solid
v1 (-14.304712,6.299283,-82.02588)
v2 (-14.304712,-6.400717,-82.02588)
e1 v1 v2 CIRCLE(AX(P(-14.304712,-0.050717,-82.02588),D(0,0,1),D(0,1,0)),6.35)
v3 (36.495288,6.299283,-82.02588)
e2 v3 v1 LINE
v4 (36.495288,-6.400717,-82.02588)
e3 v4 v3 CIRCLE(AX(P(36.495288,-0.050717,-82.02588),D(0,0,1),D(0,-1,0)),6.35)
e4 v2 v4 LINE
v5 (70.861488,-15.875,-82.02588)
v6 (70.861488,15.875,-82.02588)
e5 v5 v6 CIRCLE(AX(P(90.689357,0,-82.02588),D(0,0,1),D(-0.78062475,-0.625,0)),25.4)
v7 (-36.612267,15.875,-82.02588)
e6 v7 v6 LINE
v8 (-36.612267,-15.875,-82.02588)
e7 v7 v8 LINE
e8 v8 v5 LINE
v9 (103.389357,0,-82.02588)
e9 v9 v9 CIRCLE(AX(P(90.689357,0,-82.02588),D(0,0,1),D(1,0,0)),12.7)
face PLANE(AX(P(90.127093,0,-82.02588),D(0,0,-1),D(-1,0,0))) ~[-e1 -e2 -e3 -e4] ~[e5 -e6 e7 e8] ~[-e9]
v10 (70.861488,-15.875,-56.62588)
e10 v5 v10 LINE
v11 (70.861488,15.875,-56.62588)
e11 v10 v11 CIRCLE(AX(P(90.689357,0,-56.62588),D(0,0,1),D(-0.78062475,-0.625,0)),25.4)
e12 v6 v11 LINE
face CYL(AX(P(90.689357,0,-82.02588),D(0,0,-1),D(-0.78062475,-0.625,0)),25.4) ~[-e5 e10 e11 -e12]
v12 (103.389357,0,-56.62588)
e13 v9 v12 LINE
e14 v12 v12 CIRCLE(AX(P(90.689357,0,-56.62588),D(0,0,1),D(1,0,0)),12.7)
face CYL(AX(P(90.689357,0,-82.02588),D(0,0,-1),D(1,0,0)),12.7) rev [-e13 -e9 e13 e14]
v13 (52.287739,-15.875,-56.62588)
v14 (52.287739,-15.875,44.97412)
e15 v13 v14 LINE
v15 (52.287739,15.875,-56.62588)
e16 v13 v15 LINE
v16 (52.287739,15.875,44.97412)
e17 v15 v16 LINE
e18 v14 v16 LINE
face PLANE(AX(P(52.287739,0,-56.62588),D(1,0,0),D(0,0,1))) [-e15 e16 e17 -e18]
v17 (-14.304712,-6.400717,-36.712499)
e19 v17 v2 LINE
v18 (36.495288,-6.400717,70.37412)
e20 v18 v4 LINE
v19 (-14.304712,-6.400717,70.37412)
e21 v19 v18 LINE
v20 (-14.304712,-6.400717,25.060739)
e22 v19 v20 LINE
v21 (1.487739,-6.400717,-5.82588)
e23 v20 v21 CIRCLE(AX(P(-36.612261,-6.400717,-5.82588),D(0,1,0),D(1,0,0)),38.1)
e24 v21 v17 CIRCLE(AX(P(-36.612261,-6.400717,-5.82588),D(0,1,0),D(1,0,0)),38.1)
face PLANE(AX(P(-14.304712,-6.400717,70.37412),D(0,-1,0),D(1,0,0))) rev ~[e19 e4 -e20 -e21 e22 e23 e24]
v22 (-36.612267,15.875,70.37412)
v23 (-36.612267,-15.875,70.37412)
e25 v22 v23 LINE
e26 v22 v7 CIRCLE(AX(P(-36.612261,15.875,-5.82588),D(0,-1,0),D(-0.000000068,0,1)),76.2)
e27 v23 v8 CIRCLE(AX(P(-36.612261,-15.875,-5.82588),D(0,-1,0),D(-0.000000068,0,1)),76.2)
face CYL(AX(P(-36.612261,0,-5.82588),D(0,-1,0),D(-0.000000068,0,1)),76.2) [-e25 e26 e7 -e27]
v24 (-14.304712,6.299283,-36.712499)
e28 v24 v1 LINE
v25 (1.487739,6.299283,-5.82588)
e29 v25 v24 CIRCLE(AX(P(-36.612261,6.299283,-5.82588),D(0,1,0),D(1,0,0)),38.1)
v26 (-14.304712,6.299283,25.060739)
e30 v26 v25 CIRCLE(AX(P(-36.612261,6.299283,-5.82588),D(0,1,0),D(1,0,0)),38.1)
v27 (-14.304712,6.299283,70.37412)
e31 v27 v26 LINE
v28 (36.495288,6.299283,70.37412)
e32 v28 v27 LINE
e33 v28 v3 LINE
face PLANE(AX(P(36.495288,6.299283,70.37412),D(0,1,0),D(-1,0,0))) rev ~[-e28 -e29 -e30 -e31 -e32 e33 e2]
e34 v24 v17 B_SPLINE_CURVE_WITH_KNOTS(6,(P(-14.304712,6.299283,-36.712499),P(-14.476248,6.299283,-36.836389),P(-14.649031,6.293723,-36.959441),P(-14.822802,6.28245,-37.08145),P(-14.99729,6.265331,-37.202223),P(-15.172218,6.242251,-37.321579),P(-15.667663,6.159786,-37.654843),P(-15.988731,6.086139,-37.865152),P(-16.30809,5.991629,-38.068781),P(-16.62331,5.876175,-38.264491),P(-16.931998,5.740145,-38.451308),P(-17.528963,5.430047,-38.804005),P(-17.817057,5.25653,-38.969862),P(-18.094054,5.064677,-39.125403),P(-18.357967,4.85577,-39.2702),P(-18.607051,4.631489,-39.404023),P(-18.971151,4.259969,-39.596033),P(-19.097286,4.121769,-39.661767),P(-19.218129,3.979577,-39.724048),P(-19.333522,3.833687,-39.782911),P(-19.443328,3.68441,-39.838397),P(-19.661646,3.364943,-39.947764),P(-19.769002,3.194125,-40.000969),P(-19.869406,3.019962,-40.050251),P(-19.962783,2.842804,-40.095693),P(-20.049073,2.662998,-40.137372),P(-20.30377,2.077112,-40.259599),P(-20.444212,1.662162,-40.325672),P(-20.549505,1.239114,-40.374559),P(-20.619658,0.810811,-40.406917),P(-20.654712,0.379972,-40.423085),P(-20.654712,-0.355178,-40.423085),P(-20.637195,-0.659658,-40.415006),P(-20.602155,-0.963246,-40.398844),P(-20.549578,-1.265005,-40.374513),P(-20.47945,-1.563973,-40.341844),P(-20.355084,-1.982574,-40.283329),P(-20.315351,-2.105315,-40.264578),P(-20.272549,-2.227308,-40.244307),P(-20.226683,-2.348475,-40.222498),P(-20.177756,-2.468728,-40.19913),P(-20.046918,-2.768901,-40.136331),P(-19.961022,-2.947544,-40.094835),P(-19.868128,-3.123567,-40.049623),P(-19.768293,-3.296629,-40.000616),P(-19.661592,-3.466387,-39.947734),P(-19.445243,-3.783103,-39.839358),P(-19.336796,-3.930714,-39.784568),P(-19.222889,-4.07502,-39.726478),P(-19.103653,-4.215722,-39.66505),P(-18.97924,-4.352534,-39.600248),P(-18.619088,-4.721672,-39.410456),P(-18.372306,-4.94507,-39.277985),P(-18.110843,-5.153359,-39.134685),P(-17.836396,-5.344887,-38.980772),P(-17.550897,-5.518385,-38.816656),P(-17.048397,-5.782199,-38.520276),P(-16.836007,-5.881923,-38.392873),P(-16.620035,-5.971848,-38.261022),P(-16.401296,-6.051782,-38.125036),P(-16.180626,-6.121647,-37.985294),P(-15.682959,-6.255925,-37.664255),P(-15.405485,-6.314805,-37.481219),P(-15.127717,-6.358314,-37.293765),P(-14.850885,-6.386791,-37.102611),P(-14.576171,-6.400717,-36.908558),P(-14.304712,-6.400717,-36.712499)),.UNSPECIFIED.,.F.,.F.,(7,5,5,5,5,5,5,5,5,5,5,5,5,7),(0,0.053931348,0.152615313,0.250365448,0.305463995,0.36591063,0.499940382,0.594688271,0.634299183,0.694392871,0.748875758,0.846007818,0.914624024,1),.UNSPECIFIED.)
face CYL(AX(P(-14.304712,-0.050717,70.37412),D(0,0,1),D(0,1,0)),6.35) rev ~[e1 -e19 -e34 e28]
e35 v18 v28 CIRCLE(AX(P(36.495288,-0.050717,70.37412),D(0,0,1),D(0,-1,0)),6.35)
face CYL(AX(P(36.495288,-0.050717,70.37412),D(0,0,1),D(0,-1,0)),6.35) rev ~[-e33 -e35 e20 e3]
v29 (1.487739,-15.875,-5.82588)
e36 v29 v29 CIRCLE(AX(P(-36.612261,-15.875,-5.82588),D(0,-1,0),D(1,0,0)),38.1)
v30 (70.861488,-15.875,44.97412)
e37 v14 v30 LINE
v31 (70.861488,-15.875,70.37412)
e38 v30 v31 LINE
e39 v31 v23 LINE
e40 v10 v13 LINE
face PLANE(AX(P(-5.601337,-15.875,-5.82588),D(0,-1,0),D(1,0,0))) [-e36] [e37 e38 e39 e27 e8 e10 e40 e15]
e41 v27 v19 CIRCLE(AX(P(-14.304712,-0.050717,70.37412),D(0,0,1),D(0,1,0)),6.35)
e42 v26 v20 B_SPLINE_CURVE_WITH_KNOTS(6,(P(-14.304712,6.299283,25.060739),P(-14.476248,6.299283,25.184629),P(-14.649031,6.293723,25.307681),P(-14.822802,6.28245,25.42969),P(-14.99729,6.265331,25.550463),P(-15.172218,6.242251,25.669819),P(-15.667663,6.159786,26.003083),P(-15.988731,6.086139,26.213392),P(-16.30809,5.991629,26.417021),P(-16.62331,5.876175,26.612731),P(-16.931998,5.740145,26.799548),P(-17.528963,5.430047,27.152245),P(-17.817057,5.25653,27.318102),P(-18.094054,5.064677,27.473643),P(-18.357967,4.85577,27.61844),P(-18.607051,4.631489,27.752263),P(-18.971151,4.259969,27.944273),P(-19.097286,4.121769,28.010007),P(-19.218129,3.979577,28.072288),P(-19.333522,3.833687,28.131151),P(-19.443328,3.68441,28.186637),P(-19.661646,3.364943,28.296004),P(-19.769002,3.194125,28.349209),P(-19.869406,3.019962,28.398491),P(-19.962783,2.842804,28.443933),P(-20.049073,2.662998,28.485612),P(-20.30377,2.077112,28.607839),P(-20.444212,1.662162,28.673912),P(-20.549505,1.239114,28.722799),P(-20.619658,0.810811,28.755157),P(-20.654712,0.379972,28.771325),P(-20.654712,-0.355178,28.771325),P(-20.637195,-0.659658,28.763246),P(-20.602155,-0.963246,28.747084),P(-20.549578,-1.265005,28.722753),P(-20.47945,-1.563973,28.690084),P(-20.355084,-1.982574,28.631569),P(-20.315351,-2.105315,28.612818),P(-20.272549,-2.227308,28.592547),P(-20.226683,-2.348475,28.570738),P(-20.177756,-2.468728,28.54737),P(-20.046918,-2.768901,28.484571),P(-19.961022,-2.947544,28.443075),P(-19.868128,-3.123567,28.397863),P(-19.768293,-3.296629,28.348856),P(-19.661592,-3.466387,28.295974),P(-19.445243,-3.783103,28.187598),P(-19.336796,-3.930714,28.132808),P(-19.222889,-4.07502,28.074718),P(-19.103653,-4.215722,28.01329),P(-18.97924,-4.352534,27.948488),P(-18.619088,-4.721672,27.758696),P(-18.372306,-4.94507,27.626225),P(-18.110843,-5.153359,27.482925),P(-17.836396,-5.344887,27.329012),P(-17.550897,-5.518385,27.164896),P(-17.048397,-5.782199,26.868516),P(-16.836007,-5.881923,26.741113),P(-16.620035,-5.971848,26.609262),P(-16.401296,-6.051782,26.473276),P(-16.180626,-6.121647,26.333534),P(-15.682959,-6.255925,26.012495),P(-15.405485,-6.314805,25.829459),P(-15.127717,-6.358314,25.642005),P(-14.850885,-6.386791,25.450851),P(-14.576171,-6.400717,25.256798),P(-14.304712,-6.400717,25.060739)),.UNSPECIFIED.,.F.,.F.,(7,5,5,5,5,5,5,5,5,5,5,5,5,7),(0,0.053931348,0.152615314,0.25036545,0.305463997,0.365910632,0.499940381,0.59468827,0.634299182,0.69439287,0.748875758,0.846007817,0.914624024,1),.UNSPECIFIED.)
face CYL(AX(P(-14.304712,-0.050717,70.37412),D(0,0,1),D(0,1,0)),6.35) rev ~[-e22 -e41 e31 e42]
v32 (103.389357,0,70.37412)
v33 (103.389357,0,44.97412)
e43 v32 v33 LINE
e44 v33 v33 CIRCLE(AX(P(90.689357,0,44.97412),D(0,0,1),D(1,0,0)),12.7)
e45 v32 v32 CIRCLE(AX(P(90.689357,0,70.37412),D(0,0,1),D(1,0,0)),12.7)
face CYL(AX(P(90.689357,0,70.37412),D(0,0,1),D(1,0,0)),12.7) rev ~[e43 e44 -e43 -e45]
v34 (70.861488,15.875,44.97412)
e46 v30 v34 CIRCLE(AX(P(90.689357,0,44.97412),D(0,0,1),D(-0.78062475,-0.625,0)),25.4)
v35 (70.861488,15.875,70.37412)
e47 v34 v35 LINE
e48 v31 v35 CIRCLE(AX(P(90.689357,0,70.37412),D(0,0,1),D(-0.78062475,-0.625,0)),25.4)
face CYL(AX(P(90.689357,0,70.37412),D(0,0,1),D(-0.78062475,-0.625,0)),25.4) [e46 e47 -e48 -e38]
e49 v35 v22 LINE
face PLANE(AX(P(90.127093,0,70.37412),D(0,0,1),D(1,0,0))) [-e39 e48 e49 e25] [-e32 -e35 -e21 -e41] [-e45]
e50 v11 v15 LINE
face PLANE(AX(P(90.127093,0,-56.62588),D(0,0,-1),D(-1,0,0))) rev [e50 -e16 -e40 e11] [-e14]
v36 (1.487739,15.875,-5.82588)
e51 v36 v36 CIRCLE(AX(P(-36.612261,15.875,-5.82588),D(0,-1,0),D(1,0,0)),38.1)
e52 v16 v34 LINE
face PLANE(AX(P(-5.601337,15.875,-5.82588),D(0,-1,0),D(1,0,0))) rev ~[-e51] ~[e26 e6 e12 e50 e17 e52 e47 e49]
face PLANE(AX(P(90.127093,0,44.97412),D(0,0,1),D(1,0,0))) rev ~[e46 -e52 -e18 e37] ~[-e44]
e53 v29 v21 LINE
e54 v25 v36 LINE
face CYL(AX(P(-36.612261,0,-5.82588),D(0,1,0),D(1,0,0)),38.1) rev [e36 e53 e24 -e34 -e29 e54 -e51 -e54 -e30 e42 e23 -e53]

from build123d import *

# Parameters (mm, degrees)
F0_R     = 38.1
F1_DEPTH = 15.875
F3_DEPTH = 152.4
F4_R     = 12.7
F5_DEPTH = 25.4


# Not quite as in the source:
# - a feature names something its author has since deleted; it is built from what else it names


with BuildPart() as f1:
    # F0 (on Front) → F1 (new body, symmetric)
    with BuildSketch(Plane.XZ):
        with BuildLine():
            Line((70.8614879427, 70.3741200164), (-36.6122665732, 70.3741200164))
            ThreePointArc((-36.6122665732, 70.3741200164), (-112.8122614121, -5.8258799836), (-36.6122665732, -82.0258799836))
            Line((-36.6122665732, -82.0258799836), (70.8614879427, -82.0258799836))
            Line((70.8614879427, -82.0258799836), (70.8614879427, -56.6258799836))
            Line((70.8614879427, -56.6258799836), (52.2877385879, -56.6258799836))
            Line((52.2877385879, -56.6258799836), (52.2877385879, 44.9741200164))
            Line((52.2877385879, 44.9741200164), (70.8614879427, 44.9741200164))
            Line((70.8614879427, 44.9741200164), (70.8614879427, 70.3741200164))
        make_face()
        with Locations((-36.6122614121, -5.8258799836)):
            Circle(F0_R, mode=Mode.SUBTRACT)
    extrude(amount=F1_DEPTH, both=True)

    # F2 (on face) → F3 (cut)
    with BuildSketch(Plane.XY.offset(70.3741200164)):
        with BuildLine():
            Line((36.4952879427, 6.2992834322), (-14.3047120573, 6.2992834322))
            ThreePointArc((-14.3047120573, 6.2992834322), (-20.6547120573, -0.0507165678), (-14.3047120573, -6.4007165678))
            Line((-14.3047120573, -6.4007165678), (36.4952879427, -6.4007165678))
            ThreePointArc((36.4952879427, -6.4007165678), (42.8452879427, -0.0507165678), (36.4952879427, 6.2992834322))
        make_face()
    extrude(amount=-F3_DEPTH, mode=Mode.SUBTRACT)

    # F4 (on face) → F5 (join)
    with BuildSketch(Plane.XY.offset(70.3741200164)):
        with BuildLine():
            Line((70.8614879427, 15.875), (70.8614879427, -15.875))
            ThreePointArc((70.8614879427, -15.875), (116.0893565876, 0), (70.8614879427, 15.875))
        make_face()
        with Locations((90.6893565876, 0)):
            Circle(F4_R, mode=Mode.SUBTRACT)
    extrude(amount=-F5_DEPTH)

    # F7: F1 across plane


with BuildPart() as f1_1:
    add(f1.part)
    add(f1.part.mirror(Plane(origin=(52.2877385879, -15.875, -5.8258799836), x_dir=(1, 0, 0), z_dir=(0, 0, -1))))


solid = f1_1.part
